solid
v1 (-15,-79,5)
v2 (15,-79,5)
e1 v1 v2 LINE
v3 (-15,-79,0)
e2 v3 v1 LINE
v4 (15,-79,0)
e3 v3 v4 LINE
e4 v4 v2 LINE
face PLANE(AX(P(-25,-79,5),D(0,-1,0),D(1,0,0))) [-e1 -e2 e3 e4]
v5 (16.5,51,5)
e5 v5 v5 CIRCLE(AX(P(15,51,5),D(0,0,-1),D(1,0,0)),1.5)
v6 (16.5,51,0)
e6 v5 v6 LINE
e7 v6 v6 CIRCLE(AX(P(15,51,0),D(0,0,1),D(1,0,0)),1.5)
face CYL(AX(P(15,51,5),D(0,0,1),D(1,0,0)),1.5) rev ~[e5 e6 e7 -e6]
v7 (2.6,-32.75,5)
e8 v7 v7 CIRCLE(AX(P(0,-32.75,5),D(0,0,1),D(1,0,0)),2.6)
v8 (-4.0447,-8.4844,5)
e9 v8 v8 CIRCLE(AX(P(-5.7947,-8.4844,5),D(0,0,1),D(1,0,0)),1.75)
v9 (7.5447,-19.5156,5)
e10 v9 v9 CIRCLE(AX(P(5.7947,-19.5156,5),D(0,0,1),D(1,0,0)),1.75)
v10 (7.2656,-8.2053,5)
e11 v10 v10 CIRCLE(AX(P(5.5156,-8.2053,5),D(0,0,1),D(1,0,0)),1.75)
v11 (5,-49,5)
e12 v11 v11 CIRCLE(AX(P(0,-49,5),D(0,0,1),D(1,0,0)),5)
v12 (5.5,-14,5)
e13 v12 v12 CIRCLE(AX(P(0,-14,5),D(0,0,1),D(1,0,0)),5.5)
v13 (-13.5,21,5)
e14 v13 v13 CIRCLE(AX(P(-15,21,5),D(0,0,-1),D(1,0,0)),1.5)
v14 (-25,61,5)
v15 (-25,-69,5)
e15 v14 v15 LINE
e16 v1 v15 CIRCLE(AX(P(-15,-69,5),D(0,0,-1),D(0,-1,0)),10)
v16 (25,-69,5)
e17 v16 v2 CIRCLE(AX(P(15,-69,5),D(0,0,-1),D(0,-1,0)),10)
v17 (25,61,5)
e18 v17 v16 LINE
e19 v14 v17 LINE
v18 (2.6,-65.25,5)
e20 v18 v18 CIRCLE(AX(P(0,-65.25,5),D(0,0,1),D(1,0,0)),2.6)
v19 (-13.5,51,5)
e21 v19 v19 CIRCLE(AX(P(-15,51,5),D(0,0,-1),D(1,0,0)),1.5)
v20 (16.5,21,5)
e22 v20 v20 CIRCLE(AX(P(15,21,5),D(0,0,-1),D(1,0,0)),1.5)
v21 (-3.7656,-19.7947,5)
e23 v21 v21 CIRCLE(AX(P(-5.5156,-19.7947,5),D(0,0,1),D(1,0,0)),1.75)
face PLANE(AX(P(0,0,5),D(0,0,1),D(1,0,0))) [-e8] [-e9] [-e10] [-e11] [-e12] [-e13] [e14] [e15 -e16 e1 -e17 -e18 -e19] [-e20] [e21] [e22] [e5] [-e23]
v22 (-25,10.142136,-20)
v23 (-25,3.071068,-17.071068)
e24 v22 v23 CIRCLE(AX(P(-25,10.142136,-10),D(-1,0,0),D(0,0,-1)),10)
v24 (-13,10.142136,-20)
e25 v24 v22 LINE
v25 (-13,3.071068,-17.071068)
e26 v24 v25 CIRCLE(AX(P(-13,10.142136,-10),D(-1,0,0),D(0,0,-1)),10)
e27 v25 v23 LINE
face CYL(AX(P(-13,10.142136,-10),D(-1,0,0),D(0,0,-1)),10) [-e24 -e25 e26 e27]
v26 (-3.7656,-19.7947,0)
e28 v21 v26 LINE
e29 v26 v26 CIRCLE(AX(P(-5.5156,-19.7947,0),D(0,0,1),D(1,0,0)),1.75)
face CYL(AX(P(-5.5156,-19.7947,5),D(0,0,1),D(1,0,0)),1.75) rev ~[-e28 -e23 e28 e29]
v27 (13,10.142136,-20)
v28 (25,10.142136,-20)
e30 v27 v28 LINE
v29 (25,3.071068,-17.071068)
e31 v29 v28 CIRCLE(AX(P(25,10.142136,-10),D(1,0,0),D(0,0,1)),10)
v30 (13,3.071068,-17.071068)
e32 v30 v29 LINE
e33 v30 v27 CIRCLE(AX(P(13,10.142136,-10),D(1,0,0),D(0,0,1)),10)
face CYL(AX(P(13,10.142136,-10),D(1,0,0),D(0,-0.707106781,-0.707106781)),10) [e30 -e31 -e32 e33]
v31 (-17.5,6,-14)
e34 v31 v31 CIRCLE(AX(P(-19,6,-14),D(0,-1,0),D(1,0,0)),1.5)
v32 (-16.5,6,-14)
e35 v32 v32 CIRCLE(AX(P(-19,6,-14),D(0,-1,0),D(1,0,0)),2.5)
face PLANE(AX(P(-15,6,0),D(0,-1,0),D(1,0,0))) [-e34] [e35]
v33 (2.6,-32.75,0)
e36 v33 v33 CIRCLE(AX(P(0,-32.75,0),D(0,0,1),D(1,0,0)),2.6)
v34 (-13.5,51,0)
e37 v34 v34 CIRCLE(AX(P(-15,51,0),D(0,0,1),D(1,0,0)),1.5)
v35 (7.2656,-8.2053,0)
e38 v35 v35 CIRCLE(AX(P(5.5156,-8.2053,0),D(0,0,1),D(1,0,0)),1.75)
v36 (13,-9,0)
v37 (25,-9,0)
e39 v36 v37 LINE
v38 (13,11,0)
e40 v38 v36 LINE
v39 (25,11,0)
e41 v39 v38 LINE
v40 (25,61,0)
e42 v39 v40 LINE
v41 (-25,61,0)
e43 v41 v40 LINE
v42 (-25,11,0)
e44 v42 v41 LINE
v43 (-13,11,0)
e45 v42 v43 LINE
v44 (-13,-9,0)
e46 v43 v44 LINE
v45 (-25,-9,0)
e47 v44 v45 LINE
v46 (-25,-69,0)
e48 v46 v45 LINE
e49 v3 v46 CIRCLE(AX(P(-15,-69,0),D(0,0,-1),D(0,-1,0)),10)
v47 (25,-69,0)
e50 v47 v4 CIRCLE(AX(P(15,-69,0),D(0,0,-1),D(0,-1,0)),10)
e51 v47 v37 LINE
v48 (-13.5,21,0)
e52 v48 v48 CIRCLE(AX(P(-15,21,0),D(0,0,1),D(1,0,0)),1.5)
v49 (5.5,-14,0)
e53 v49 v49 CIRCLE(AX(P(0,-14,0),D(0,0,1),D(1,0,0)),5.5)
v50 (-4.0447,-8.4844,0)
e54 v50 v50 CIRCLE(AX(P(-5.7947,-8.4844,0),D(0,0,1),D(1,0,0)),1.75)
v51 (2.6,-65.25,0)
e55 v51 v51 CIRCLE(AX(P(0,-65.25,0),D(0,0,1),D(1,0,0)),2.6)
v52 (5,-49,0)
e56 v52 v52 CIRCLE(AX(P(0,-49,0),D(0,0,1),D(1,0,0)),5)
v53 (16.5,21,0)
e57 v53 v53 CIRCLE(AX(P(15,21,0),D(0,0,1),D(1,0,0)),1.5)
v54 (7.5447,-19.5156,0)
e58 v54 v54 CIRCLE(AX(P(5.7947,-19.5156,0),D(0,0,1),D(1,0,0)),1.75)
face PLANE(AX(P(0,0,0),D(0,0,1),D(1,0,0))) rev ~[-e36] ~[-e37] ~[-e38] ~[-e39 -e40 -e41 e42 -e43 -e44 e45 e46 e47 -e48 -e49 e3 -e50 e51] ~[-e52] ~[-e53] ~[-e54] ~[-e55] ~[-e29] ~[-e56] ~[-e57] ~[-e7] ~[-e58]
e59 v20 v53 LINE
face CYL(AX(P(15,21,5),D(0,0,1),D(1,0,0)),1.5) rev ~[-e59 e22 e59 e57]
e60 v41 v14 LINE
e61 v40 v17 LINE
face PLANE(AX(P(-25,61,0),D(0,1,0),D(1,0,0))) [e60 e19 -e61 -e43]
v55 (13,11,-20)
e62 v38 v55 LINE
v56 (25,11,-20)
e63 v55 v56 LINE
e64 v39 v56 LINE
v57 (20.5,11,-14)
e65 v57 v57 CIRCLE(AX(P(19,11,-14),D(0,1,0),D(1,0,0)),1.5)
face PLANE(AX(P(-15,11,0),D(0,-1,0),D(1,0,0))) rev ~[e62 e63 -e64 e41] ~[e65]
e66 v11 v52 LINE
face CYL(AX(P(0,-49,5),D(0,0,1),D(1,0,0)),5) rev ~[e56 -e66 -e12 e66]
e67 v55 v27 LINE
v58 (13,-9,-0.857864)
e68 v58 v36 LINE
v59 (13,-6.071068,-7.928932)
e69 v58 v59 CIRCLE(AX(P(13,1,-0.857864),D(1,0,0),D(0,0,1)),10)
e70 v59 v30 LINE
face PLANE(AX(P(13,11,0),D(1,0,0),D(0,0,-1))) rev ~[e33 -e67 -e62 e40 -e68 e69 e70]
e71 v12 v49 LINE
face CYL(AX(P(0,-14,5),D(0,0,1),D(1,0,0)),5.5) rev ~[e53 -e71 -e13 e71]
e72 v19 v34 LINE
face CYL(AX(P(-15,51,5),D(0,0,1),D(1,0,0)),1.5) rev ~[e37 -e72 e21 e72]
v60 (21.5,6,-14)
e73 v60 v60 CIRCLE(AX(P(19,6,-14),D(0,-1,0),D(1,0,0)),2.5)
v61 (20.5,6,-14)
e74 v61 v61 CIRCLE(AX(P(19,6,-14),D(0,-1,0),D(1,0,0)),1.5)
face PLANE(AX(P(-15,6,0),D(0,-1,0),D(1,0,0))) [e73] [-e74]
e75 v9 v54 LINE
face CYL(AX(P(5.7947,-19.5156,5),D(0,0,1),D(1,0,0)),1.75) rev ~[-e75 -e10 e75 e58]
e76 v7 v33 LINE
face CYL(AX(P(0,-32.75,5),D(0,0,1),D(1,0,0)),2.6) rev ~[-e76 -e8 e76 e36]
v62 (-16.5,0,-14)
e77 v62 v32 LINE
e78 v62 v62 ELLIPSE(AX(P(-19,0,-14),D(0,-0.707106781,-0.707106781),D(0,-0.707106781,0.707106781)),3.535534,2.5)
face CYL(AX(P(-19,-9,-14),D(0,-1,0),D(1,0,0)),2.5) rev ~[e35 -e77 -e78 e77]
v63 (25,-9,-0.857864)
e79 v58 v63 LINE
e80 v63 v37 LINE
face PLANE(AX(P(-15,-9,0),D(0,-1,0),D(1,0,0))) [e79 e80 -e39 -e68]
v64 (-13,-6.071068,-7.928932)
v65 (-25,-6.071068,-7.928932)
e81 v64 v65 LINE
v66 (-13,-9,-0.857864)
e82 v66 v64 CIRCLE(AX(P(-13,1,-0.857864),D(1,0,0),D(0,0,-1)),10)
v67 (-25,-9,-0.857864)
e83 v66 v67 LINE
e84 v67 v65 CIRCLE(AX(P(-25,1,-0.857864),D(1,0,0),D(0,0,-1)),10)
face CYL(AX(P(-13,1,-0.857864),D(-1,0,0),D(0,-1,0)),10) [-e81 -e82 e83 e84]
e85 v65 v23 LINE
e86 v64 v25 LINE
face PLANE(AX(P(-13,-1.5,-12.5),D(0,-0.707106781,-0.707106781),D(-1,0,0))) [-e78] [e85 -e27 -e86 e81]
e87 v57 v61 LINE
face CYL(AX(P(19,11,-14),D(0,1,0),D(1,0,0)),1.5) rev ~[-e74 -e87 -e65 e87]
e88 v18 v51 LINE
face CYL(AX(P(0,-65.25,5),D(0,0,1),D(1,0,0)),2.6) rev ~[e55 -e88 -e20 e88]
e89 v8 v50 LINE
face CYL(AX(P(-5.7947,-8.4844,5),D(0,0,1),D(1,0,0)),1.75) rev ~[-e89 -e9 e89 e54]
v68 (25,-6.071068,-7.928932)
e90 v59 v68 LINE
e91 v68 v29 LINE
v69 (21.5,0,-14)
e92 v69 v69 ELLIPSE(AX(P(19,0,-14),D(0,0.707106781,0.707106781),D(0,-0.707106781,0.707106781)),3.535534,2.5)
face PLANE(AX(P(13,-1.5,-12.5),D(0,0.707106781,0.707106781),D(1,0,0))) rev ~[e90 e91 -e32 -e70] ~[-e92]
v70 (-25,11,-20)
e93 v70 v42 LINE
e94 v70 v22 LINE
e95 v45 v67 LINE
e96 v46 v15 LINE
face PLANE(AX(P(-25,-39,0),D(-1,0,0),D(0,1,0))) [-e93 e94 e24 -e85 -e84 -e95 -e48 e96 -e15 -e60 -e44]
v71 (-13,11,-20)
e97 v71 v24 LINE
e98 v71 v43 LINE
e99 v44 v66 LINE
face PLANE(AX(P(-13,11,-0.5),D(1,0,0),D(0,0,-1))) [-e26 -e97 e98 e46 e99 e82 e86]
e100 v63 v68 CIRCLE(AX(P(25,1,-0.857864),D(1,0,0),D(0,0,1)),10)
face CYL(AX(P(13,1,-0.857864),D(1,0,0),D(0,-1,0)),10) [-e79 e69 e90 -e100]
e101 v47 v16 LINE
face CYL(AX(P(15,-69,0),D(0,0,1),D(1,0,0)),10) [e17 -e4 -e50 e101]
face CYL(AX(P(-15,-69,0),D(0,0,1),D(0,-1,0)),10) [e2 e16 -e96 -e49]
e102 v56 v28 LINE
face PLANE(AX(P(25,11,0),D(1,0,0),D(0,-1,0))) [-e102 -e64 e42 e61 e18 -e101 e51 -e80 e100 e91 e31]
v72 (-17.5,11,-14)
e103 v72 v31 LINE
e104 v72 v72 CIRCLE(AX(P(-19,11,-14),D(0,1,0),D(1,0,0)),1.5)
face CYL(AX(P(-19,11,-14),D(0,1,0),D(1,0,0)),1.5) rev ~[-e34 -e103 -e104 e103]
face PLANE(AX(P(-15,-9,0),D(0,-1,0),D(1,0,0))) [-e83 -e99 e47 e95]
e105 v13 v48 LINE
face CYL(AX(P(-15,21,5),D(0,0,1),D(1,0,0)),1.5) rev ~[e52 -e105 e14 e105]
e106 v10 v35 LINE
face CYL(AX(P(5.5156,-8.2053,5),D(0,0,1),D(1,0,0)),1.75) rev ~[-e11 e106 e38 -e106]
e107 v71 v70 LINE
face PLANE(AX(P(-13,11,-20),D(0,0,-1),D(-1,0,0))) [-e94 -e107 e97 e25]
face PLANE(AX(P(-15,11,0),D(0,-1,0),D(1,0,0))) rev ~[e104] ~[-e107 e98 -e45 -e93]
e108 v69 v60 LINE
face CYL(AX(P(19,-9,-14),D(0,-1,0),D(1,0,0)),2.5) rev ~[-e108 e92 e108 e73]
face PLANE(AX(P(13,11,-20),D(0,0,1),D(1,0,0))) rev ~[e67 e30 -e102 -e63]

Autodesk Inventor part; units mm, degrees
ref_plane "YZ Plane" through (0, 0, 0) normal (1, 0, 0) x (0, 1, 0)
ref_plane "XZ Plane" through (0, 0, 0) normal (0, 1, 0) x (-1, 0, 0)
ref_plane "XY Plane" through (0, 0, 0) normal (0, 0, 1) x (1, 0, 0)
sketch "Sketch1" plane through (0, 0, 0) normal (0, 0, 1) x (1, 0, 0)
  line L0 (25, 11) -> (-25, 11) projected
  line L1 (-25, 61) -> (25, 61)
  line L2 (25, 61) -> (25, -39)
  line L3 (25, -39) -> (-25, -39)
  line L4 (-25, -39) -> (-25, 61)
  line L5 (-25, 61) -> (25, -39) construction
  line L6 (25, 61) -> (-25, -39) construction
  line L7 (25, -39) -> (-25, -39)
  line L8 (-25, -39) -> (-25, -89)
  line L9 (-25, -89) -> (25, -89)
  line L10 (25, -89) -> (25, -39)
  point P0 (0, 0)
  point P1 (0, 11)
  dimension "d0" = 50
  dimension "d1" = 100
  dimension "d2" = 50
  dimension "d3" = 50
extrude "Extrusion1" add sketch "Sketch1" along normal blind 5
fillet "Fillet1" radius 10 2 edges at (25, -89, 2.5) (-25, -89, 2.5)
ref_plane "Work Plane1" through (-15, 11, 0) normal (0, -1, 0) x (1, 0, 0)
sketch "Sketch2" plane through (-15, 11, 0) normal (0, -1, 0) x (1, 0, 0)
  line L0 (40, -0.5) -> (-10, -0.5) projected
  line L1 (-10, -0.5) -> (-10, -3.5) projected
  line L2 (40, -3.5) -> (-10, -3.5) projected
  line L3 (40, -0.5) -> (40, -3.5) projected
  line L4 (-10, -3.5) -> (40, -3.5) projected
  line L5 (-10, -3.5) -> (-10, -53.5) projected
  line L6 (-10, -53.5) -> (40, -53.5) projected
  line L7 (40, -53.5) -> (40, -3.5) projected
  line L8 (40, -3.5) -> (-10, -3.5) projected
  ellipse E0 centre (15, -28.5) end of major axis (18.5, -28.5) minor radius 3.5 projected
  line L9 (-10, 0) -> (0, 0) projected
  line L10 (40, 0) -> (-10, 0) projected
  line L11 (30, 0) -> (40, 0) projected
  line L12 (0, 0) -> (30, 0) projected
  line L13 (25, -0.5) -> (5, -0.5) projected
  line L14 (5, -0.5) -> (5, -20.5) projected
  line L15 (25, -20.5) -> (5, -20.5) projected
  line L16 (25, -0.5) -> (25, -20.5) projected
  line L17 (40, 0) -> (28, 0)
  line L18 (28, 0) -> (28, -20)
  line L19 (28, -20) -> (40, -20)
  line L20 (40, -20) -> (40, 0)
  line L21 (-10, 0) -> (2, 0)
  line L22 (2, 0) -> (2, -20)
  line L23 (2, -20) -> (-10, -20)
  line L24 (-10, -20) -> (-10, 0)
  point P0 (15, 0)
  dimension "d8" = 12
  dimension "d9" = 20
  dimension "d10" = 12
  dimension "d11" = 20
extrude "Extrusion2" add sketch "Sketch2" along normal blind 20 contours L18 L10 L20 L0 | L0 L3 L2 L18 | L22 L2 L1 L0 | L0 L24 L9 L10 L22 | L2 L7 L19 L18 | L22 L23 L5 L2
chamfer "Chamfer1" distance 15 angle 45 2 edges at (-19, -9, -20) (19, -9, -20)
fillet "Fillet2" radius 10 2 edges at (-19, 6, -20) (-19, -9, -5)
fillet "Fillet3" radius 10 2 edges at (19, -9, -5) (19, 6, -20)
sketch "Sketch3" plane through (0, 0, 5) normal (0, 0, 1) x (1, 0, 0)
  line L0 (25, -79) -> (25, 61) projected
  line L1 (-25, 61) -> (-25, -79) projected
  line L2 (25, 61) -> (-25, 61)
  line L3 (-25, 61) -> (-25, 11)
  line L4 (-25, 11) -> (25, 11)
  line L5 (25, 11) -> (25, 61)
  line L6 (-15, 51) -> (15, 51)
  line L7 (15, 51) -> (15, 21)
  line L8 (15, 21) -> (-15, 21)
  line L9 (-15, 21) -> (-15, 51)
  line L10 (-15, 51) -> (15, 21) construction
  line L11 (15, 51) -> (-15, 21) construction
  circle A0 centre (15, 21) radius 1.5
  circle A1 centre (15, 51) radius 1.5
  circle A2 centre (-15, 51) radius 1.5
  circle A3 centre (-15, 21) radius 1.5
  point P0 (0, 0)
  point P1 (0, 36)
  dimension "d19" = 50
  dimension "d20" = 30
  dimension "d21" = 30
  dimension "d22" = 3
  dimension "d23" = 3
  dimension "d24" = 3
  dimension "d25" = 3
extrude "Extrusion3" cut sketch "Sketch3" against normal blind 20 contours L9 A2 L6 | L6 A2 L9 | A1 L7 L6 | L6 L7 A1 | A3 L8 L9 | L9 L8 A3 | A0 L8 L7 | L7 L8 A0
sketch "Sketch4" plane through (-15, 11, 0) normal (0, 1, 0) x (1, 0, 0)
  line L0 (-10, 0) -> (-10, 20) projected
  line L1 (-10, 20) -> (2, 20)
  line L2 (2, 20) -> (2, 8)
  line L3 (2, 8) -> (-10, 8)
  line L4 (-10, 8) -> (-10, 20)
  circle A0 centre (-4, 14) radius 1.5
  circle A1 centre (34, 14) radius 1.5
  point P0 (15, 0)
  dimension "d28" = 12
  dimension "d29" = 12
  dimension "d30" = 3
  dimension "d33" = 38
extrude "Extrusion4" cut sketch "Sketch4" against normal through all contours A0 | A1
sketch "Sketch5" plane through (-15, -9, 0) normal (0, -1, 0) x (1, 0, 0)
  circle A0 centre (34, -14) radius 1.5 projected
  circle A1 centre (-4, -14) radius 1.5 projected
  circle A2 centre (34, -14) radius 2.5
  circle A3 centre (-4, -14) radius 1.5 projected
  circle A4 centre (-4, -14) radius 2.5
  point P0 (15, 0)
  dimension "d40" = 5
  dimension "d41" = 5
extrude "Extrusion5" cut sketch "Sketch5" against normal blind 15
sketch "Sketch6" plane through (0, 0, 5) normal (0, 0, 1) x (1, 0, 0)
  circle A0 centre (0, -49) radius 5
  line L0 (25, 61) -> (-25, 61) projected
  circle A1 centre (0, -32.75) radius 2.6
  circle A2 centre (0, -65.25) radius 2.6
  circle A3 centre (0, -14) radius 5.5
  point P0 (0, 0)
  dimension "d44" = 10
  dimension "d45" = 110
  dimension "d46" = 5.2
  dimension "d47" = 5.2
  dimension "d48" = 16.25
  dimension "d49" = 16.25
  dimension "d52" = 11
  dimension "d53" = 75
extrude "Extrusion6" cut sketch "Sketch6" against normal blind 10
sketch "Sketch7" plane through (0, 0, 5) normal (0, 0, 1) x (1, 0, 0)
  circle A0 centre (-5.7947, -8.4844) radius 1.75
  circle A1 centre (-5.5156, -19.7947) radius 1.75
  circle A2 centre (5.7947, -19.5156) radius 1.75
  circle A3 centre (5.5156, -8.2053) radius 1.75
  point P0 (0, 0)
extrude "Extrusion7" cut sketch "Sketch7" against normal through all
sketch "Sketch8" plane through (0, 0, 5) normal (0, 0, 1) x (1, 0, 0)
  line L0 (-25, 61) -> (-25, -79) projected
  arc A0 (15, -89) -> (25, -79) centre (15, -79) ccw projected
  line L1 (-25, -79) -> (25, -79)
  circle A1 centre (5.7947, -19.5156) radius 1.75 projected
  circle A2 centre (-5.5156, -19.7947) radius 1.75 projected
  circle A3 centre (5.5156, -8.2053) radius 1.75 projected
  circle A4 centre (-5.7947, -8.4844) radius 1.75 projected
  circle A5 centre (0, -32.75) radius 2.6 projected
  circle A6 centre (0, -49) radius 5 projected
  circle A7 centre (0, -65.25) radius 2.6 projected
  circle A8 centre (0, -14) radius 5.5 projected
  circle A9 centre (-15, 21) radius 1.5 projected
  circle A10 centre (15, 21) radius 1.5 projected
  circle A11 centre (-15, 51) radius 1.5 projected
  circle A12 centre (15, 51) radius 1.5 projected
  arc A13 (-25, -79) -> (-15, -89) centre (-15, -79) ccw projected
  line L2 (-15, -89) -> (15, -89) projected
  arc A14 (15, -89) -> (25, -79) centre (15, -79) ccw projected
  line L3 (25, -79) -> (25, 61) projected
  line L4 (25, 61) -> (-25, 61) projected
  line L5 (-25, 61) -> (-25, -79) projected
  point P0 (0, 0)
extrude "Extrusion8" cut sketch "Sketch8" against normal blind 10 contours L1 A0 L2 A13
fillet "Fillet4" radius 10 2 edges at (25, -79, 2.5) (-25, -79, 2.5)
properties part number "3d mount for linear bearing"
